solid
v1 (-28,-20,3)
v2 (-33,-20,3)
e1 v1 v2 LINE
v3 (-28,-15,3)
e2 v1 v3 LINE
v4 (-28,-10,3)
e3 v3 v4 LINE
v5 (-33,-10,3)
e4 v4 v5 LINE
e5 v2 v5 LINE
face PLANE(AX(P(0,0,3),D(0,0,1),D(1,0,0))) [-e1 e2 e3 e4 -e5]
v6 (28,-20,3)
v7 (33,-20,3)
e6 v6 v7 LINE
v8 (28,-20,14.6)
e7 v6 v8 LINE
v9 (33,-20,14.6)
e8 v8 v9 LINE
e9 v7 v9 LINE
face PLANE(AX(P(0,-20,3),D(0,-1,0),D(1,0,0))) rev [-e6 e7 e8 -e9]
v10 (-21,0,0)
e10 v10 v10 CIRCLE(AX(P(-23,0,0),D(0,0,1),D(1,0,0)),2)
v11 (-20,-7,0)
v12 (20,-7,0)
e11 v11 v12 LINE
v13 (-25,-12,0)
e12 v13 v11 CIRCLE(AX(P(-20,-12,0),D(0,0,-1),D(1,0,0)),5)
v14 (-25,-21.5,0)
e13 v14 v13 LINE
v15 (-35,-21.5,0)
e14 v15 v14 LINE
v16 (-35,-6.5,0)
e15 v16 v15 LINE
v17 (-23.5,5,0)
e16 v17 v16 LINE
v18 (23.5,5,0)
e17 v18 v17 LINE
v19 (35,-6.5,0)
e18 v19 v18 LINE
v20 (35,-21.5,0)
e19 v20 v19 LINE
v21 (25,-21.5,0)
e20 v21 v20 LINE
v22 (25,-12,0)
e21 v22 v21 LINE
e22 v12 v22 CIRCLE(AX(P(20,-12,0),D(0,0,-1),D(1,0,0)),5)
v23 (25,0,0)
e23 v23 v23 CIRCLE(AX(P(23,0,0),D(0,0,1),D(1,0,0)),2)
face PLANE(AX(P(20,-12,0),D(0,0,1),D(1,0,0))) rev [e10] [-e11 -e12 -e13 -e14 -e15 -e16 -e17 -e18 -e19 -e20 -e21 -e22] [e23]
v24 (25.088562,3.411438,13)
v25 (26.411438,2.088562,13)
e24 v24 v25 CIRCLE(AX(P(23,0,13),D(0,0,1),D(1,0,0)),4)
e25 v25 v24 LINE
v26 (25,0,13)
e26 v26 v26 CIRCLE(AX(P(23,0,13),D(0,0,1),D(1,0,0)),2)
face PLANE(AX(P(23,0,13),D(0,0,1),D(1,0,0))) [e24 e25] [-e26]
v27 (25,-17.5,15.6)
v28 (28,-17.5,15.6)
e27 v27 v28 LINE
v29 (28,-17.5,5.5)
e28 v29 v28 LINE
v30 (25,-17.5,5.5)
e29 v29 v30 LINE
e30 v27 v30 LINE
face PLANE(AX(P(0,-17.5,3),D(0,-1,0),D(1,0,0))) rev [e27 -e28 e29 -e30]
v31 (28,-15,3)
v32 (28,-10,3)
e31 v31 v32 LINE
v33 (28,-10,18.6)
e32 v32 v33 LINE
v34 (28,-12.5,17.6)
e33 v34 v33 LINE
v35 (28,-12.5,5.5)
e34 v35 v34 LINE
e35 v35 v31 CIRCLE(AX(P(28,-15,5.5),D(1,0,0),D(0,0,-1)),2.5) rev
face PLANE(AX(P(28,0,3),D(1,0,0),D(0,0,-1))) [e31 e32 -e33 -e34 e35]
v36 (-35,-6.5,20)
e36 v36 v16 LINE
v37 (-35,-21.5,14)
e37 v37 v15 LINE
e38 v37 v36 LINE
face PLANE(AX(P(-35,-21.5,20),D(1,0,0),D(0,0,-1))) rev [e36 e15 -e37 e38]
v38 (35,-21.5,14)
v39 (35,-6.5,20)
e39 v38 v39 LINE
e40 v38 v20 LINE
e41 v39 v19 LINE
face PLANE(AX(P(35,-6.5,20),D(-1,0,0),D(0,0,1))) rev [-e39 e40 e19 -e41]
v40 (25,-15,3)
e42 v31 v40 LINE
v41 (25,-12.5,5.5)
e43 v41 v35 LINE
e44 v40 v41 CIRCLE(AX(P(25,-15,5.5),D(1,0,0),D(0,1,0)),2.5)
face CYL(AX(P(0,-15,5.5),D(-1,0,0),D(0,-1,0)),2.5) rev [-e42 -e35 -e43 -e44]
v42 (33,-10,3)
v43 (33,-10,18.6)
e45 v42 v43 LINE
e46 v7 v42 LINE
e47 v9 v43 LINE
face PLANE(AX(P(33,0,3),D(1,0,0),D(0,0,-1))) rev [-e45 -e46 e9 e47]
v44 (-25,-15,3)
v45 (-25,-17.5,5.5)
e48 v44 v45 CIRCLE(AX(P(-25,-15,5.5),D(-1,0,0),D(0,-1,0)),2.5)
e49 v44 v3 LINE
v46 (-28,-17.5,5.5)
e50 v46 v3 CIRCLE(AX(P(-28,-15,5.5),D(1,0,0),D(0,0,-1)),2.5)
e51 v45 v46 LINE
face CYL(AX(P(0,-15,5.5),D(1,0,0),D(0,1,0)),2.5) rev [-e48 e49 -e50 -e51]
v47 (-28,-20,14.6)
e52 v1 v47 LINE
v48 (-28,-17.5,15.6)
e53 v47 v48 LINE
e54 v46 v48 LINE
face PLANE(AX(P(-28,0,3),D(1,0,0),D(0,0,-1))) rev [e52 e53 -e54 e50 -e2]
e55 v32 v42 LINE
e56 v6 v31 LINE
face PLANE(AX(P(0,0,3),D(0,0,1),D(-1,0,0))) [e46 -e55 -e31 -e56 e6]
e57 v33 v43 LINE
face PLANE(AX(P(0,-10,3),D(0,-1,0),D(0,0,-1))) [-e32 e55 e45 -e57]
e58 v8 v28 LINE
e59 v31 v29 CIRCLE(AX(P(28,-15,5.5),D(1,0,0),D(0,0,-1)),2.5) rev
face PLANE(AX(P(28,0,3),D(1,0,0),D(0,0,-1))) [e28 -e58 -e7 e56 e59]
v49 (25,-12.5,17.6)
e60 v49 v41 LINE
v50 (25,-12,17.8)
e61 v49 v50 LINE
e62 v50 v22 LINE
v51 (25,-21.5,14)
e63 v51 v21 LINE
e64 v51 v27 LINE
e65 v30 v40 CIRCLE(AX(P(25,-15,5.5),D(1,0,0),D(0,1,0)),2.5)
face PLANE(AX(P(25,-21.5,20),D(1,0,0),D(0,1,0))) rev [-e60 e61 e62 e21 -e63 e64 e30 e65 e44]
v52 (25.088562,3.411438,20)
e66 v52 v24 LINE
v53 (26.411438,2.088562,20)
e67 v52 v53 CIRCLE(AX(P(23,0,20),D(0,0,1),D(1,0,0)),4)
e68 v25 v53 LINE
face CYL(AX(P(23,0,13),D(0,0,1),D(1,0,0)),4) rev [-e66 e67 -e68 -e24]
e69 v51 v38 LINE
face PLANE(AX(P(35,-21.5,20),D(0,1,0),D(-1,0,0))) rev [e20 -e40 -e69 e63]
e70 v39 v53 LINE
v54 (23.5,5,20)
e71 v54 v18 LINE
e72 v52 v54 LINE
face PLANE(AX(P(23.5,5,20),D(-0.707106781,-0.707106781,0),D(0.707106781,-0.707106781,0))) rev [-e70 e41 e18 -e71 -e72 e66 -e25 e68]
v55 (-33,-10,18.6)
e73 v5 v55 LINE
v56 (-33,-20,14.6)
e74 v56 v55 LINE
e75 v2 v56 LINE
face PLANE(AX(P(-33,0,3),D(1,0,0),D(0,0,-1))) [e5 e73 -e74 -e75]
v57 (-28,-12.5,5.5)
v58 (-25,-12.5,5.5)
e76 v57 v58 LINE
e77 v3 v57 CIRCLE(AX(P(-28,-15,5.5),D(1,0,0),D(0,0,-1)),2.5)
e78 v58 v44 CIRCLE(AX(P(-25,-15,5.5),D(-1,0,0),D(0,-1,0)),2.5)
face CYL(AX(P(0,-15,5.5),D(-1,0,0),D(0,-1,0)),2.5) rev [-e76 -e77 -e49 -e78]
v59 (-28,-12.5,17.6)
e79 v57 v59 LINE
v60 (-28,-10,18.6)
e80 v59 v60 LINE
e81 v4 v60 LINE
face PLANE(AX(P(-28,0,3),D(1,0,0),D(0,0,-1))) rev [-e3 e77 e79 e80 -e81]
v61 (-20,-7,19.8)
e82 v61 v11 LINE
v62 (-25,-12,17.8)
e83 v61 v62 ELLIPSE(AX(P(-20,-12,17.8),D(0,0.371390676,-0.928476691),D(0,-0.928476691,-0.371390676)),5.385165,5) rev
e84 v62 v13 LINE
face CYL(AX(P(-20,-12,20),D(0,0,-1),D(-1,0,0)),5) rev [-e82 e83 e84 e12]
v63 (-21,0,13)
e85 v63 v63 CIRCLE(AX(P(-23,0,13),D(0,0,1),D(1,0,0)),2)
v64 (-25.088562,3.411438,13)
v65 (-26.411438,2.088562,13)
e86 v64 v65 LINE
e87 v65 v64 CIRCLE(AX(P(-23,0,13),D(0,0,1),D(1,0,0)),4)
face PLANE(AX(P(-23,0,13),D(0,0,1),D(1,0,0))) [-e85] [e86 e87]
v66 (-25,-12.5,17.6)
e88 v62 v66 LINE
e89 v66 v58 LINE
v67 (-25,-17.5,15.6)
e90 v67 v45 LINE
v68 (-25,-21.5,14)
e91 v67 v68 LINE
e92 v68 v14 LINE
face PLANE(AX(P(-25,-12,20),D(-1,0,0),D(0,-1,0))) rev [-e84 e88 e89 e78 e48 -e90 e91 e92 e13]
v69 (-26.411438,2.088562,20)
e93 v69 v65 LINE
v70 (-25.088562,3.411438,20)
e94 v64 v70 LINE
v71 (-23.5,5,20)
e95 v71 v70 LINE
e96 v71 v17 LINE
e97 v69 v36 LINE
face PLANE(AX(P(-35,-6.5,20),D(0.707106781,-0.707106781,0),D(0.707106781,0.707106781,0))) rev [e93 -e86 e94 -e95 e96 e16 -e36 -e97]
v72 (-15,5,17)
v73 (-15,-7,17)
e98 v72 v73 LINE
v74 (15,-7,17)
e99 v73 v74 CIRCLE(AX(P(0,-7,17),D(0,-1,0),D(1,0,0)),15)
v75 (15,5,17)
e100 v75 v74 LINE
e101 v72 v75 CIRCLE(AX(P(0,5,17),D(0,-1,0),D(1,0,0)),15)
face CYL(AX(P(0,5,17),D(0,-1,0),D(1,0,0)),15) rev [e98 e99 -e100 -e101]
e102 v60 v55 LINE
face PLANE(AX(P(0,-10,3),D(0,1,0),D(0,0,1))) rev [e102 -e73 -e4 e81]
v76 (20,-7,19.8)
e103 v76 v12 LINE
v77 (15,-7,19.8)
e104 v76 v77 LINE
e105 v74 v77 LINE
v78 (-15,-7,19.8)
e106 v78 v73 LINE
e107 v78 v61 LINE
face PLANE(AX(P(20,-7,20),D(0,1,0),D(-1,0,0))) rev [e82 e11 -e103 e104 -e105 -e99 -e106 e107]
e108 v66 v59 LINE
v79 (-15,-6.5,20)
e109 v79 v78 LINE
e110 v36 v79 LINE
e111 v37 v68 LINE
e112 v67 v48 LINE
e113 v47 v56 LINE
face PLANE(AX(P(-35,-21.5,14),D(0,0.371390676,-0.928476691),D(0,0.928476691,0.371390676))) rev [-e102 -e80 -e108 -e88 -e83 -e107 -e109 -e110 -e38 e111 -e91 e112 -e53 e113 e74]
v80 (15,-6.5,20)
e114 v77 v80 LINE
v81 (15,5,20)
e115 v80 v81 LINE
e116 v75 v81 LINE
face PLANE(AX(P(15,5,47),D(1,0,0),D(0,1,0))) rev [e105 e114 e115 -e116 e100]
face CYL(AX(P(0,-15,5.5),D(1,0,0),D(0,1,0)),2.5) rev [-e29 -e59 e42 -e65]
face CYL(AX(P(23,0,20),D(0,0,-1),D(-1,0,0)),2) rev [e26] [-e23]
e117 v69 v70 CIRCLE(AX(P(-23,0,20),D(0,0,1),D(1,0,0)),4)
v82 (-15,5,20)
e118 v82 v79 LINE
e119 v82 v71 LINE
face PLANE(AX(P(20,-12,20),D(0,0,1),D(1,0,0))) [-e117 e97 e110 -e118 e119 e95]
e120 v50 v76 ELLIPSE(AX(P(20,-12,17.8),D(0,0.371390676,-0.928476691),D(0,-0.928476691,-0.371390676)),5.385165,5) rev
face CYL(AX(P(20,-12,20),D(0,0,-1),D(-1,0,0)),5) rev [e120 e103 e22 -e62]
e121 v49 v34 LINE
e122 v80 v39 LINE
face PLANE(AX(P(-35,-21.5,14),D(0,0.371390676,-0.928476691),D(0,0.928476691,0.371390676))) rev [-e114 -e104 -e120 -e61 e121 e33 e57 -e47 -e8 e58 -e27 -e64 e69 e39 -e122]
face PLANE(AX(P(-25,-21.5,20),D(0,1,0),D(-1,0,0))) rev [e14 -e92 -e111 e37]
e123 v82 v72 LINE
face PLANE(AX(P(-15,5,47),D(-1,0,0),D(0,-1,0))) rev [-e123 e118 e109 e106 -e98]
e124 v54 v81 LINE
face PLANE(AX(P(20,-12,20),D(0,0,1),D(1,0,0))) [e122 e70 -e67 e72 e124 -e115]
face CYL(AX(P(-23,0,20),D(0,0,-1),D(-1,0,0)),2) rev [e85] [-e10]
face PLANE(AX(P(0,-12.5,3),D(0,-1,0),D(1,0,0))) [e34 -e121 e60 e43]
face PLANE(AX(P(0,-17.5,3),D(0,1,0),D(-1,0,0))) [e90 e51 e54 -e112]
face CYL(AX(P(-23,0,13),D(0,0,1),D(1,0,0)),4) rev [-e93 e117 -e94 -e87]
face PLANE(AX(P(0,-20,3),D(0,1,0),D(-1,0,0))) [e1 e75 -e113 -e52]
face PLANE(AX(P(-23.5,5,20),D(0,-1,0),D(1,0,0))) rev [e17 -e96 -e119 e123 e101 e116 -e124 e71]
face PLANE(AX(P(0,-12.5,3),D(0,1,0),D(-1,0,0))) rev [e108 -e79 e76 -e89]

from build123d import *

# Parameters (mm, degrees)
SKETCH1_R               = 2
BOSS_EXTRUDE1_DEPTH     = 20
SKETCH2_W               = 5.5
SKETCH2_H               = 5
SKETCH2_W_2             = 3
SKETCH2_W_3             = 2.5
CUT_EXTRUDE1_DEPTH      = 17
FILLET1_R               = 2.5
FILLET1_OF_MIRROR1_R    = 2.5
CUT_EXTRUDE2_DEPTH      = 43.839817927
CUT_EXTRUDE3_DEPTH      = 46.686431246
CUT_EXTRUDE3_DEPTH_BACK = 46.686431246
SKETCH5_R               = 4
CUT_EXTRUDE4_DEPTH      = 7


with BuildPart() as part:
    # Sketch1 → Boss-Extrude1 (new body)
    with BuildSketch(Plane.XY):
        with BuildLine():
            Line((-23.5, 5), (23.5, 5))
            Line((23.5, 5), (35, -6.5))
            Line((35, -6.5), (35, -21.5))
            Line((35, -21.5), (25, -21.5))
            Line((25, -21.5), (25, -12))
            ThreePointArc((25, -12), (23.535533906, -8.464466094), (20, -7))
            Line((20, -7), (-20, -7))
            ThreePointArc((-20, -7), (-23.535533906, -8.464466094), (-25, -12))
            Line((-25, -12), (-25, -21.5))
            Line((-25, -21.5), (-35, -21.5))
            Line((-35, -21.5), (-35, -6.5))
            Line((-35, -6.5), (-23.5, 5))
        make_face()
        with Locations((-23, 0)):
            Circle(SKETCH1_R, mode=Mode.SUBTRACT)
        with Locations((23, 0)):
            Circle(SKETCH1_R, mode=Mode.SUBTRACT)
    extrude(amount=BOSS_EXTRUDE1_DEPTH)

    # Sketch2 → Cut-Extrude1 (cut)
    with BuildSketch(Plane.XY.offset(20)):
        with Locations((-22.25, -15)):
            Rectangle(SKETCH2_W, SKETCH2_H)
        with Locations((-26.5, -15)):
            Rectangle(SKETCH2_W_2, SKETCH2_H)
        with Locations((-29.25, -15)):
            Rectangle(SKETCH2_W_3, SKETCH2_H)
        Polygon((-30.5, -12.5), (-28, -12.5), (-28, -10), (-33, -10), (-33, -20), (-28, -20), (-28, -17.5), (-30.5, -17.5), align=None)
    cut_extrude1 = extrude(amount=-CUT_EXTRUDE1_DEPTH, mode=Mode.SUBTRACT)

    # Fillet1
    fillet1_edges = [part.edges().sort_by_distance(p)[0] for p in [
        (-26.5, -17.5, 3),
        (-26.5, -12.5, 3),
    ]]
    fillet(fillet1_edges, radius=FILLET1_R - 0.0001)  # a hair under: the kernel refuses the full size

    # Mirror1: Cut-Extrude1 across plane
    add(cut_extrude1.mirror(Plane(origin=(0, 0, 0), x_dir=(0, 0, 1), z_dir=(1, 0, 0))), mode=Mode.SUBTRACT)

    # Fillet1 of Mirror1
    fillet1_of_mirror1_edges = [part.edges().sort_by_distance(p)[0] for p in [
        (26.5, -17.5, 3),
        (26.5, -12.5, 3),
    ]]
    fillet(fillet1_of_mirror1_edges, radius=FILLET1_OF_MIRROR1_R - 0.0001)  # a hair under: the kernel refuses the full size

    # Sketch3 → Cut-Extrude2 (cut, through all)
    with BuildSketch(Plane.XZ.offset(7)):
        with BuildLine():
            Line((-15, 47), (15, 47))
            Line((15, 47), (15, 17))
            ThreePointArc((15, 17), (0, 2), (-15, 17))
            Line((-15, 17), (-15, 47))
        make_face()
    extrude(amount=-CUT_EXTRUDE2_DEPTH, mode=Mode.SUBTRACT)

    # Sketch4 → Cut-Extrude3 (cut, two sides: drawn at the far end of the back side and taken through both)
    with BuildSketch(Plane(origin=(0, 0, 0), x_dir=(0, 0, -1), z_dir=(1, 0, 0)).offset(-CUT_EXTRUDE3_DEPTH_BACK)):
        Polygon((-14, -21.5), (-20, -6.5), (-20, -21.5), align=None)
    extrude(amount=CUT_EXTRUDE3_DEPTH + CUT_EXTRUDE3_DEPTH_BACK, mode=Mode.SUBTRACT)

    # Sketch5 → Cut-Extrude4 (cut)
    with BuildSketch(Plane.XY.offset(20)):
        with Locations((-23, 0)):
            Circle(SKETCH5_R)
        with Locations((23, 0)):
            Circle(SKETCH5_R)
    extrude(amount=-CUT_EXTRUDE4_DEPTH, mode=Mode.SUBTRACT)


solid = part.part
